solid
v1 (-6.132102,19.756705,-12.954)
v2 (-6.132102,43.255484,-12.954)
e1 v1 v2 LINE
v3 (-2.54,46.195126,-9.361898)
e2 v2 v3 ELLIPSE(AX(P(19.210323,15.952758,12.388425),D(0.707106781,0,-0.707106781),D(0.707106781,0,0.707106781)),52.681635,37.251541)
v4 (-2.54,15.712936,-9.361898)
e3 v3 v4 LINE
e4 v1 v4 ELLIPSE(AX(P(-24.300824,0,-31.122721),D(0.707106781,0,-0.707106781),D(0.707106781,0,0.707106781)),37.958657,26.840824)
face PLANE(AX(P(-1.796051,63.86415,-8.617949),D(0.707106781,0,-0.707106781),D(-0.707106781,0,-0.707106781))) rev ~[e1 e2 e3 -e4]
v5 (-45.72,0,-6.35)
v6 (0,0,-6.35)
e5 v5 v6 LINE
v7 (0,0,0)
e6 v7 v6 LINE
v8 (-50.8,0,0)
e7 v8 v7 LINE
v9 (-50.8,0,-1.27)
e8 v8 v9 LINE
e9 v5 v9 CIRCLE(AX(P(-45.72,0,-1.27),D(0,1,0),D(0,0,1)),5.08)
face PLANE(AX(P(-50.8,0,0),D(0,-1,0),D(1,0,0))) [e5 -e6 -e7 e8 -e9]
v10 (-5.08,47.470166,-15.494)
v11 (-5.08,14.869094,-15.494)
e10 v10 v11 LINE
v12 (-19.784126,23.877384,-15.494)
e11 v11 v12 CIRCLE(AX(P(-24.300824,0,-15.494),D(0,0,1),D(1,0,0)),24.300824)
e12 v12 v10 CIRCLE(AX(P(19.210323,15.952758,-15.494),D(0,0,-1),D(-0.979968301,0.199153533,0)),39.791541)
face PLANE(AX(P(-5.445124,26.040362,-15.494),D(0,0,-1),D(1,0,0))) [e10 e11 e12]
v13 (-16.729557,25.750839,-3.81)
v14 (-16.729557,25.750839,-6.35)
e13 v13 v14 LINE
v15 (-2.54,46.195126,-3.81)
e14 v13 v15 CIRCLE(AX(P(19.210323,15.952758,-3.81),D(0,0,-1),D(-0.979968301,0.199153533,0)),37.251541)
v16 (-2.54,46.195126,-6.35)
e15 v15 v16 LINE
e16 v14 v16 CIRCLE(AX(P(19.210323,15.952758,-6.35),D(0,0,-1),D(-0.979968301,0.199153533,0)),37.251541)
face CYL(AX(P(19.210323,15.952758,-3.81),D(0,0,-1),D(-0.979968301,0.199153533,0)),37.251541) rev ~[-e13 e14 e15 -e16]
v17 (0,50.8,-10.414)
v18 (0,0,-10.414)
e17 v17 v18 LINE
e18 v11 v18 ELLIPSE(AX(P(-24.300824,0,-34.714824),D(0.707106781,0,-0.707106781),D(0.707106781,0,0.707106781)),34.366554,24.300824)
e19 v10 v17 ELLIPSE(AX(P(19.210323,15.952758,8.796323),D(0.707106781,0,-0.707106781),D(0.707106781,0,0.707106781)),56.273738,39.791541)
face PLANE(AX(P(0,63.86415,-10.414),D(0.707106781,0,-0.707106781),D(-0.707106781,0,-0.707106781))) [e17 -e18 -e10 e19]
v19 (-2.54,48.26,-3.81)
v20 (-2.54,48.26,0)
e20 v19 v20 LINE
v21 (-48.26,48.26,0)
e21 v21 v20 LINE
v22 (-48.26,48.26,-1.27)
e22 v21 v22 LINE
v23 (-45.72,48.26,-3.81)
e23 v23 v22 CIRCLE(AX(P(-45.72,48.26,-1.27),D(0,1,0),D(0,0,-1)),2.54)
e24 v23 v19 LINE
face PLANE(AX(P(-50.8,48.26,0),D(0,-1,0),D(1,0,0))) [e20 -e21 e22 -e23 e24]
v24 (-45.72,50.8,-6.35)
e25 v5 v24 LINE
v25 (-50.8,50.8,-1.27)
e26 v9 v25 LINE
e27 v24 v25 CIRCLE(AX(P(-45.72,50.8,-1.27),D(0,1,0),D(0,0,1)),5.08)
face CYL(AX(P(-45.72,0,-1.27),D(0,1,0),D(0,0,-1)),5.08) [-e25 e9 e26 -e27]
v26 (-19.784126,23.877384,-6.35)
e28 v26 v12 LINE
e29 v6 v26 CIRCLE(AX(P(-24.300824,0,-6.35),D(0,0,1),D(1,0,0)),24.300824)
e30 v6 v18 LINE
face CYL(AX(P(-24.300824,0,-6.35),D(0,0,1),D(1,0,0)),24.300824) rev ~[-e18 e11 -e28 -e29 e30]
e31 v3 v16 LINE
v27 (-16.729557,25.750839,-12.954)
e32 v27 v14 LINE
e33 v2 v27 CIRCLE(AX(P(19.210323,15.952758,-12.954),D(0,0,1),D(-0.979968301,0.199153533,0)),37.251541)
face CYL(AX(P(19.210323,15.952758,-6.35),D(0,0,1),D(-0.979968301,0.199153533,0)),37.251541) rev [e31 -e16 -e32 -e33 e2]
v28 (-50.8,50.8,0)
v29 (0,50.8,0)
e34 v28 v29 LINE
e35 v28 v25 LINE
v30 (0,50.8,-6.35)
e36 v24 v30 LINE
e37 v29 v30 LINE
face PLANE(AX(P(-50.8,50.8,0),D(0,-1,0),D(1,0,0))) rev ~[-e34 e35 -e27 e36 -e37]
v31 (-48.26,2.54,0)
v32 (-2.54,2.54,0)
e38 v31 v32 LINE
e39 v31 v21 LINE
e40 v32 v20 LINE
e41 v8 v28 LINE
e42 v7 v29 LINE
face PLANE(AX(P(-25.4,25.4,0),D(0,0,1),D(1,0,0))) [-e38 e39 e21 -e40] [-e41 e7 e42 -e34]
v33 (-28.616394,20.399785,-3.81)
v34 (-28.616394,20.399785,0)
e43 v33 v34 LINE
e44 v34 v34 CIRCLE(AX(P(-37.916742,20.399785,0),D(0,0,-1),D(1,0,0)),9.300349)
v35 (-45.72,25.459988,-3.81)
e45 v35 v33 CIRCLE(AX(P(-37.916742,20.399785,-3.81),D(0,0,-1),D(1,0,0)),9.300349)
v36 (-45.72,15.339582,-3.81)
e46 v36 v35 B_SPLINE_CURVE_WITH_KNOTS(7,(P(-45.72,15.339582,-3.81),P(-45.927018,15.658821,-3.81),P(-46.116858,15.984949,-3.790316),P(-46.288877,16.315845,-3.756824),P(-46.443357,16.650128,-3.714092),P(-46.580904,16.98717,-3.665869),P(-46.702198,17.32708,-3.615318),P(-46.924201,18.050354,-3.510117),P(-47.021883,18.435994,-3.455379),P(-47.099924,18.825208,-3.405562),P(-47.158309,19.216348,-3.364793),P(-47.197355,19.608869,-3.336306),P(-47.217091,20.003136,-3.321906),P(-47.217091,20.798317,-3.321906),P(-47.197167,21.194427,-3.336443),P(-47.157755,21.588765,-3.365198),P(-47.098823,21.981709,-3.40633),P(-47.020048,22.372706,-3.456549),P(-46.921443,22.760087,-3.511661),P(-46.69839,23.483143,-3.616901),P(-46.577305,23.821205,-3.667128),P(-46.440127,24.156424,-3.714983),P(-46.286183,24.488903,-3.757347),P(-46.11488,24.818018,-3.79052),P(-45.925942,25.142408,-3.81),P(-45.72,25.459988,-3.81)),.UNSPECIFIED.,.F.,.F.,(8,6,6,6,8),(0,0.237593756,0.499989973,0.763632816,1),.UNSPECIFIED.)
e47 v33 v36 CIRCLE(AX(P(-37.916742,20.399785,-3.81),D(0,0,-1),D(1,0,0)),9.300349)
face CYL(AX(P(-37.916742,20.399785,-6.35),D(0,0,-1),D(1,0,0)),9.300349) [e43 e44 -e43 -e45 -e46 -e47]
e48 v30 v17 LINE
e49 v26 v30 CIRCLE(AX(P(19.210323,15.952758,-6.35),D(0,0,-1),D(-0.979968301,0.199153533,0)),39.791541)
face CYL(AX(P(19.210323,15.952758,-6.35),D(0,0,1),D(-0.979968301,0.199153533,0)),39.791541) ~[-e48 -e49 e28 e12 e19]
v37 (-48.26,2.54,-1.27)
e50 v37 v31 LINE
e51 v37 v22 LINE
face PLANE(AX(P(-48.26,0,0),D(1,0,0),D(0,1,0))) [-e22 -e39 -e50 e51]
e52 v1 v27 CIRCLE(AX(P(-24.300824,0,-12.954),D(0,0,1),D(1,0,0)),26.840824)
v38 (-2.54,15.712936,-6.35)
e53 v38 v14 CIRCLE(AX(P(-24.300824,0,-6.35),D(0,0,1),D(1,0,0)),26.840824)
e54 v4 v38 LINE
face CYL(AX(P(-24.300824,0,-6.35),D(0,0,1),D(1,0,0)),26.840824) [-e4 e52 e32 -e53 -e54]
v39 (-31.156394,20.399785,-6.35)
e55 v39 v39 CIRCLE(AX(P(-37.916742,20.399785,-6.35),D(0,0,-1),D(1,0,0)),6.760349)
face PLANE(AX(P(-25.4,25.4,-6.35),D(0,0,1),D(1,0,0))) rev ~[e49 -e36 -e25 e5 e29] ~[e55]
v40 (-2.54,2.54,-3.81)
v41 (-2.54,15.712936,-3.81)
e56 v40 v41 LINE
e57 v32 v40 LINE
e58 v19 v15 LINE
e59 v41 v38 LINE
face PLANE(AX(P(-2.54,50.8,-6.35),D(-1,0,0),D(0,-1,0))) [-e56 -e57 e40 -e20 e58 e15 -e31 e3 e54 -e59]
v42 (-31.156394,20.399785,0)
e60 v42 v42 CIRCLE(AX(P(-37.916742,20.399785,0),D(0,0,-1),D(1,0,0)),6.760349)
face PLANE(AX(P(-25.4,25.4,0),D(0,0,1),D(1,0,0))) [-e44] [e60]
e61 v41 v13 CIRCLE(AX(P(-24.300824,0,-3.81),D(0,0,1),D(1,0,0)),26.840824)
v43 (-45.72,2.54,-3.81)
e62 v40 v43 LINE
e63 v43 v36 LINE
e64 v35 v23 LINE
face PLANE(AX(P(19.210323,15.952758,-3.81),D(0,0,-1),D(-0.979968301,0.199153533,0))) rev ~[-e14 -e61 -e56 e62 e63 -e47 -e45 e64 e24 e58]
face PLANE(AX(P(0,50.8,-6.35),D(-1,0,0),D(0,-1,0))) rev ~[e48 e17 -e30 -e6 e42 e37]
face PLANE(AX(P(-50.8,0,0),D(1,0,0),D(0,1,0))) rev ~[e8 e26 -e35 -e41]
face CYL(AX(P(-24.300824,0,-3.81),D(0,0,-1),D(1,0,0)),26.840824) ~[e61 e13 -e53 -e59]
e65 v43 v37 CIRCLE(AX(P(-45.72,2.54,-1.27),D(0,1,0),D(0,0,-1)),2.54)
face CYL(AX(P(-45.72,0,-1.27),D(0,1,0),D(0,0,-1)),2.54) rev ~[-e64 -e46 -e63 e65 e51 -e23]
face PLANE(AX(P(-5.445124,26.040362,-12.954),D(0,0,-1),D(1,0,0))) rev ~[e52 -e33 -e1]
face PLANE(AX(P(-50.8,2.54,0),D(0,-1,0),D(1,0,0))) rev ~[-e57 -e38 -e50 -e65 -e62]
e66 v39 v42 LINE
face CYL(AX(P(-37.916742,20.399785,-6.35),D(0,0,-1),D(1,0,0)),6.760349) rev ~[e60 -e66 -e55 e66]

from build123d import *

# Parameters (mm, degrees)
F0_W        = 50.8
F0_H        = 50.8
F1_DEPTH    = 6.35
F3_DEPTH    = 9.144
F2_R        = 6.7603485979
F4_DEPTH    = 25.4
F5_R        = 5.08
F6_T1_DEPTH = 86.0732038629
F7_T        = 2.54
F7_T4_ANGLE = 49.6458001059
F7_T6_ANGLE = 79.2883730852


# Not quite as in the source:
# - a fillet or chamfer that OpenCascade refuses, or shapes differently, is made with other operations: its cross-section is extruded or revolved along the edge and cut away or added
# - a shell that OpenCascade refuses in one call is made with other operations: the cavity is built on its own and cut out


with BuildPart() as f1:
    # F0 (on Top) → F1 (new body)
    with BuildSketch(Plane.XY):
        with Locations((-25.4, 25.4)):
            Rectangle(F0_W, F0_H)
    extrude(amount=-F1_DEPTH)

    # F2 (on face) → F3 (join)
    with BuildSketch(Plane(origin=(0, 0, -6.35), x_dir=(1, 0, 0), z_dir=(0, 0, -1))):
        with BuildLine():
            ThreePointArc((0, 0), (-5.5886686099, -15.504363354), (-19.7841264307, -23.8773841411))
            ThreePointArc((-19.7841264307, -23.8773841411), (-12.8545439956, -39.5156757118), (0, -50.8))
            Line((0, -50.8), (0, 0))
        make_face()
    extrude(amount=F3_DEPTH)

    # F2 (on face) → F4 (cut)
    with BuildSketch(Plane(origin=(0, 0, -6.35), x_dir=(1, 0, 0), z_dir=(0, 0, -1))):
        with Locations((-37.9167422652, -20.3997846693)):
            Circle(F2_R)
    extrude(amount=-F4_DEPTH, mode=Mode.SUBTRACT)

    # F5
    f5_edges = [f1.edges().sort_by_distance(p)[0] for p in [
        (-50.8, 25.4, -6.35),
    ]]
    fillet(f5_edges, radius=F5_R)

    # F6: chamfer of 5.08 on 1 edges, made by hand

    # F6_s2 → F6_t1 (cut)
    with BuildSketch(Plane.XZ.offset(-63.8641495789)):
        Polygon((0, -10.414), (-5.08, -15.494), (0, -15.494), align=None)
    extrude(amount=F6_T1_DEPTH, mode=Mode.SUBTRACT)

    # F7: shell of thickness 2.54, made by hand


with BuildPart() as f7_core1:
    # F7_t2: copy of F1
    add(f1.part)

    # the walls: a layer under each face that stays
    f7_faces = [f7_core1.faces().sort_by_distance(p)[0] for p in [
        (-25.4, 0, -3.175),
        (-50.8, 25.4, -0.635),
        (-49.3121024484, 25.4, -4.8621024484),
        (-22.86, 25.4, -6.35),
        (0, 25.4, -5.207),
        (-25.4, 50.8, -3.175),
        (-44.6770908632, 20.3997846693, -3.175),
        (-12.8545439956, 39.5156757118, -10.922),
        (-5.5886686099, 15.504363354, -10.922),
        (-2.54, 25.4, -12.954),
        (-12.4320632154, 31.169630086, -15.494),
    ]]
    thicken(f7_faces, amount=-F7_T, mode=Mode.SUBTRACT)

    # F7_s3 → F7_t4 (revolve, cut)
    with BuildSketch(Plane(origin=(3.8753287702, 19.0692040386, 0), x_dir=(0, 0, 1), z_dir=(-0.1991535327, -0.9799683007, 0))):
        Polygon((-6.3754, 24.1684821625), (-3.81, 24.1430821625), (-3.81, 21.6030821625), (-6.35, 21.6030821625), align=None)
    revolve(axis=Axis((19.2103228569, 15.9527580845, -6.35), (0, 0, -1)), revolution_arc=F7_T4_ANGLE, mode=Mode.SUBTRACT)

    # F7_s5 → F7_t6 (revolve, cut)
    with BuildSketch(Plane.XZ):
        Polygon((-0.0254, -6.3754), (0, -3.81), (2.54, -3.81), (2.54, -6.35), align=None)
    revolve(axis=Axis((-24.3008235773, 0, -6.35), (0, 0, 1)), revolution_arc=F7_T6_ANGLE, mode=Mode.SUBTRACT)


with BuildPart() as f1_1:
    add(f1.part)

    # what is left inside the walls is the cavity
    f7_cavity = [f7_core1.part.solids().sort_by_distance(p)[0] for p in [
        (-25.4, 17.78, -0.0254),
    ]]
    add(f7_cavity, mode=Mode.SUBTRACT)


solid = f1_1.part
